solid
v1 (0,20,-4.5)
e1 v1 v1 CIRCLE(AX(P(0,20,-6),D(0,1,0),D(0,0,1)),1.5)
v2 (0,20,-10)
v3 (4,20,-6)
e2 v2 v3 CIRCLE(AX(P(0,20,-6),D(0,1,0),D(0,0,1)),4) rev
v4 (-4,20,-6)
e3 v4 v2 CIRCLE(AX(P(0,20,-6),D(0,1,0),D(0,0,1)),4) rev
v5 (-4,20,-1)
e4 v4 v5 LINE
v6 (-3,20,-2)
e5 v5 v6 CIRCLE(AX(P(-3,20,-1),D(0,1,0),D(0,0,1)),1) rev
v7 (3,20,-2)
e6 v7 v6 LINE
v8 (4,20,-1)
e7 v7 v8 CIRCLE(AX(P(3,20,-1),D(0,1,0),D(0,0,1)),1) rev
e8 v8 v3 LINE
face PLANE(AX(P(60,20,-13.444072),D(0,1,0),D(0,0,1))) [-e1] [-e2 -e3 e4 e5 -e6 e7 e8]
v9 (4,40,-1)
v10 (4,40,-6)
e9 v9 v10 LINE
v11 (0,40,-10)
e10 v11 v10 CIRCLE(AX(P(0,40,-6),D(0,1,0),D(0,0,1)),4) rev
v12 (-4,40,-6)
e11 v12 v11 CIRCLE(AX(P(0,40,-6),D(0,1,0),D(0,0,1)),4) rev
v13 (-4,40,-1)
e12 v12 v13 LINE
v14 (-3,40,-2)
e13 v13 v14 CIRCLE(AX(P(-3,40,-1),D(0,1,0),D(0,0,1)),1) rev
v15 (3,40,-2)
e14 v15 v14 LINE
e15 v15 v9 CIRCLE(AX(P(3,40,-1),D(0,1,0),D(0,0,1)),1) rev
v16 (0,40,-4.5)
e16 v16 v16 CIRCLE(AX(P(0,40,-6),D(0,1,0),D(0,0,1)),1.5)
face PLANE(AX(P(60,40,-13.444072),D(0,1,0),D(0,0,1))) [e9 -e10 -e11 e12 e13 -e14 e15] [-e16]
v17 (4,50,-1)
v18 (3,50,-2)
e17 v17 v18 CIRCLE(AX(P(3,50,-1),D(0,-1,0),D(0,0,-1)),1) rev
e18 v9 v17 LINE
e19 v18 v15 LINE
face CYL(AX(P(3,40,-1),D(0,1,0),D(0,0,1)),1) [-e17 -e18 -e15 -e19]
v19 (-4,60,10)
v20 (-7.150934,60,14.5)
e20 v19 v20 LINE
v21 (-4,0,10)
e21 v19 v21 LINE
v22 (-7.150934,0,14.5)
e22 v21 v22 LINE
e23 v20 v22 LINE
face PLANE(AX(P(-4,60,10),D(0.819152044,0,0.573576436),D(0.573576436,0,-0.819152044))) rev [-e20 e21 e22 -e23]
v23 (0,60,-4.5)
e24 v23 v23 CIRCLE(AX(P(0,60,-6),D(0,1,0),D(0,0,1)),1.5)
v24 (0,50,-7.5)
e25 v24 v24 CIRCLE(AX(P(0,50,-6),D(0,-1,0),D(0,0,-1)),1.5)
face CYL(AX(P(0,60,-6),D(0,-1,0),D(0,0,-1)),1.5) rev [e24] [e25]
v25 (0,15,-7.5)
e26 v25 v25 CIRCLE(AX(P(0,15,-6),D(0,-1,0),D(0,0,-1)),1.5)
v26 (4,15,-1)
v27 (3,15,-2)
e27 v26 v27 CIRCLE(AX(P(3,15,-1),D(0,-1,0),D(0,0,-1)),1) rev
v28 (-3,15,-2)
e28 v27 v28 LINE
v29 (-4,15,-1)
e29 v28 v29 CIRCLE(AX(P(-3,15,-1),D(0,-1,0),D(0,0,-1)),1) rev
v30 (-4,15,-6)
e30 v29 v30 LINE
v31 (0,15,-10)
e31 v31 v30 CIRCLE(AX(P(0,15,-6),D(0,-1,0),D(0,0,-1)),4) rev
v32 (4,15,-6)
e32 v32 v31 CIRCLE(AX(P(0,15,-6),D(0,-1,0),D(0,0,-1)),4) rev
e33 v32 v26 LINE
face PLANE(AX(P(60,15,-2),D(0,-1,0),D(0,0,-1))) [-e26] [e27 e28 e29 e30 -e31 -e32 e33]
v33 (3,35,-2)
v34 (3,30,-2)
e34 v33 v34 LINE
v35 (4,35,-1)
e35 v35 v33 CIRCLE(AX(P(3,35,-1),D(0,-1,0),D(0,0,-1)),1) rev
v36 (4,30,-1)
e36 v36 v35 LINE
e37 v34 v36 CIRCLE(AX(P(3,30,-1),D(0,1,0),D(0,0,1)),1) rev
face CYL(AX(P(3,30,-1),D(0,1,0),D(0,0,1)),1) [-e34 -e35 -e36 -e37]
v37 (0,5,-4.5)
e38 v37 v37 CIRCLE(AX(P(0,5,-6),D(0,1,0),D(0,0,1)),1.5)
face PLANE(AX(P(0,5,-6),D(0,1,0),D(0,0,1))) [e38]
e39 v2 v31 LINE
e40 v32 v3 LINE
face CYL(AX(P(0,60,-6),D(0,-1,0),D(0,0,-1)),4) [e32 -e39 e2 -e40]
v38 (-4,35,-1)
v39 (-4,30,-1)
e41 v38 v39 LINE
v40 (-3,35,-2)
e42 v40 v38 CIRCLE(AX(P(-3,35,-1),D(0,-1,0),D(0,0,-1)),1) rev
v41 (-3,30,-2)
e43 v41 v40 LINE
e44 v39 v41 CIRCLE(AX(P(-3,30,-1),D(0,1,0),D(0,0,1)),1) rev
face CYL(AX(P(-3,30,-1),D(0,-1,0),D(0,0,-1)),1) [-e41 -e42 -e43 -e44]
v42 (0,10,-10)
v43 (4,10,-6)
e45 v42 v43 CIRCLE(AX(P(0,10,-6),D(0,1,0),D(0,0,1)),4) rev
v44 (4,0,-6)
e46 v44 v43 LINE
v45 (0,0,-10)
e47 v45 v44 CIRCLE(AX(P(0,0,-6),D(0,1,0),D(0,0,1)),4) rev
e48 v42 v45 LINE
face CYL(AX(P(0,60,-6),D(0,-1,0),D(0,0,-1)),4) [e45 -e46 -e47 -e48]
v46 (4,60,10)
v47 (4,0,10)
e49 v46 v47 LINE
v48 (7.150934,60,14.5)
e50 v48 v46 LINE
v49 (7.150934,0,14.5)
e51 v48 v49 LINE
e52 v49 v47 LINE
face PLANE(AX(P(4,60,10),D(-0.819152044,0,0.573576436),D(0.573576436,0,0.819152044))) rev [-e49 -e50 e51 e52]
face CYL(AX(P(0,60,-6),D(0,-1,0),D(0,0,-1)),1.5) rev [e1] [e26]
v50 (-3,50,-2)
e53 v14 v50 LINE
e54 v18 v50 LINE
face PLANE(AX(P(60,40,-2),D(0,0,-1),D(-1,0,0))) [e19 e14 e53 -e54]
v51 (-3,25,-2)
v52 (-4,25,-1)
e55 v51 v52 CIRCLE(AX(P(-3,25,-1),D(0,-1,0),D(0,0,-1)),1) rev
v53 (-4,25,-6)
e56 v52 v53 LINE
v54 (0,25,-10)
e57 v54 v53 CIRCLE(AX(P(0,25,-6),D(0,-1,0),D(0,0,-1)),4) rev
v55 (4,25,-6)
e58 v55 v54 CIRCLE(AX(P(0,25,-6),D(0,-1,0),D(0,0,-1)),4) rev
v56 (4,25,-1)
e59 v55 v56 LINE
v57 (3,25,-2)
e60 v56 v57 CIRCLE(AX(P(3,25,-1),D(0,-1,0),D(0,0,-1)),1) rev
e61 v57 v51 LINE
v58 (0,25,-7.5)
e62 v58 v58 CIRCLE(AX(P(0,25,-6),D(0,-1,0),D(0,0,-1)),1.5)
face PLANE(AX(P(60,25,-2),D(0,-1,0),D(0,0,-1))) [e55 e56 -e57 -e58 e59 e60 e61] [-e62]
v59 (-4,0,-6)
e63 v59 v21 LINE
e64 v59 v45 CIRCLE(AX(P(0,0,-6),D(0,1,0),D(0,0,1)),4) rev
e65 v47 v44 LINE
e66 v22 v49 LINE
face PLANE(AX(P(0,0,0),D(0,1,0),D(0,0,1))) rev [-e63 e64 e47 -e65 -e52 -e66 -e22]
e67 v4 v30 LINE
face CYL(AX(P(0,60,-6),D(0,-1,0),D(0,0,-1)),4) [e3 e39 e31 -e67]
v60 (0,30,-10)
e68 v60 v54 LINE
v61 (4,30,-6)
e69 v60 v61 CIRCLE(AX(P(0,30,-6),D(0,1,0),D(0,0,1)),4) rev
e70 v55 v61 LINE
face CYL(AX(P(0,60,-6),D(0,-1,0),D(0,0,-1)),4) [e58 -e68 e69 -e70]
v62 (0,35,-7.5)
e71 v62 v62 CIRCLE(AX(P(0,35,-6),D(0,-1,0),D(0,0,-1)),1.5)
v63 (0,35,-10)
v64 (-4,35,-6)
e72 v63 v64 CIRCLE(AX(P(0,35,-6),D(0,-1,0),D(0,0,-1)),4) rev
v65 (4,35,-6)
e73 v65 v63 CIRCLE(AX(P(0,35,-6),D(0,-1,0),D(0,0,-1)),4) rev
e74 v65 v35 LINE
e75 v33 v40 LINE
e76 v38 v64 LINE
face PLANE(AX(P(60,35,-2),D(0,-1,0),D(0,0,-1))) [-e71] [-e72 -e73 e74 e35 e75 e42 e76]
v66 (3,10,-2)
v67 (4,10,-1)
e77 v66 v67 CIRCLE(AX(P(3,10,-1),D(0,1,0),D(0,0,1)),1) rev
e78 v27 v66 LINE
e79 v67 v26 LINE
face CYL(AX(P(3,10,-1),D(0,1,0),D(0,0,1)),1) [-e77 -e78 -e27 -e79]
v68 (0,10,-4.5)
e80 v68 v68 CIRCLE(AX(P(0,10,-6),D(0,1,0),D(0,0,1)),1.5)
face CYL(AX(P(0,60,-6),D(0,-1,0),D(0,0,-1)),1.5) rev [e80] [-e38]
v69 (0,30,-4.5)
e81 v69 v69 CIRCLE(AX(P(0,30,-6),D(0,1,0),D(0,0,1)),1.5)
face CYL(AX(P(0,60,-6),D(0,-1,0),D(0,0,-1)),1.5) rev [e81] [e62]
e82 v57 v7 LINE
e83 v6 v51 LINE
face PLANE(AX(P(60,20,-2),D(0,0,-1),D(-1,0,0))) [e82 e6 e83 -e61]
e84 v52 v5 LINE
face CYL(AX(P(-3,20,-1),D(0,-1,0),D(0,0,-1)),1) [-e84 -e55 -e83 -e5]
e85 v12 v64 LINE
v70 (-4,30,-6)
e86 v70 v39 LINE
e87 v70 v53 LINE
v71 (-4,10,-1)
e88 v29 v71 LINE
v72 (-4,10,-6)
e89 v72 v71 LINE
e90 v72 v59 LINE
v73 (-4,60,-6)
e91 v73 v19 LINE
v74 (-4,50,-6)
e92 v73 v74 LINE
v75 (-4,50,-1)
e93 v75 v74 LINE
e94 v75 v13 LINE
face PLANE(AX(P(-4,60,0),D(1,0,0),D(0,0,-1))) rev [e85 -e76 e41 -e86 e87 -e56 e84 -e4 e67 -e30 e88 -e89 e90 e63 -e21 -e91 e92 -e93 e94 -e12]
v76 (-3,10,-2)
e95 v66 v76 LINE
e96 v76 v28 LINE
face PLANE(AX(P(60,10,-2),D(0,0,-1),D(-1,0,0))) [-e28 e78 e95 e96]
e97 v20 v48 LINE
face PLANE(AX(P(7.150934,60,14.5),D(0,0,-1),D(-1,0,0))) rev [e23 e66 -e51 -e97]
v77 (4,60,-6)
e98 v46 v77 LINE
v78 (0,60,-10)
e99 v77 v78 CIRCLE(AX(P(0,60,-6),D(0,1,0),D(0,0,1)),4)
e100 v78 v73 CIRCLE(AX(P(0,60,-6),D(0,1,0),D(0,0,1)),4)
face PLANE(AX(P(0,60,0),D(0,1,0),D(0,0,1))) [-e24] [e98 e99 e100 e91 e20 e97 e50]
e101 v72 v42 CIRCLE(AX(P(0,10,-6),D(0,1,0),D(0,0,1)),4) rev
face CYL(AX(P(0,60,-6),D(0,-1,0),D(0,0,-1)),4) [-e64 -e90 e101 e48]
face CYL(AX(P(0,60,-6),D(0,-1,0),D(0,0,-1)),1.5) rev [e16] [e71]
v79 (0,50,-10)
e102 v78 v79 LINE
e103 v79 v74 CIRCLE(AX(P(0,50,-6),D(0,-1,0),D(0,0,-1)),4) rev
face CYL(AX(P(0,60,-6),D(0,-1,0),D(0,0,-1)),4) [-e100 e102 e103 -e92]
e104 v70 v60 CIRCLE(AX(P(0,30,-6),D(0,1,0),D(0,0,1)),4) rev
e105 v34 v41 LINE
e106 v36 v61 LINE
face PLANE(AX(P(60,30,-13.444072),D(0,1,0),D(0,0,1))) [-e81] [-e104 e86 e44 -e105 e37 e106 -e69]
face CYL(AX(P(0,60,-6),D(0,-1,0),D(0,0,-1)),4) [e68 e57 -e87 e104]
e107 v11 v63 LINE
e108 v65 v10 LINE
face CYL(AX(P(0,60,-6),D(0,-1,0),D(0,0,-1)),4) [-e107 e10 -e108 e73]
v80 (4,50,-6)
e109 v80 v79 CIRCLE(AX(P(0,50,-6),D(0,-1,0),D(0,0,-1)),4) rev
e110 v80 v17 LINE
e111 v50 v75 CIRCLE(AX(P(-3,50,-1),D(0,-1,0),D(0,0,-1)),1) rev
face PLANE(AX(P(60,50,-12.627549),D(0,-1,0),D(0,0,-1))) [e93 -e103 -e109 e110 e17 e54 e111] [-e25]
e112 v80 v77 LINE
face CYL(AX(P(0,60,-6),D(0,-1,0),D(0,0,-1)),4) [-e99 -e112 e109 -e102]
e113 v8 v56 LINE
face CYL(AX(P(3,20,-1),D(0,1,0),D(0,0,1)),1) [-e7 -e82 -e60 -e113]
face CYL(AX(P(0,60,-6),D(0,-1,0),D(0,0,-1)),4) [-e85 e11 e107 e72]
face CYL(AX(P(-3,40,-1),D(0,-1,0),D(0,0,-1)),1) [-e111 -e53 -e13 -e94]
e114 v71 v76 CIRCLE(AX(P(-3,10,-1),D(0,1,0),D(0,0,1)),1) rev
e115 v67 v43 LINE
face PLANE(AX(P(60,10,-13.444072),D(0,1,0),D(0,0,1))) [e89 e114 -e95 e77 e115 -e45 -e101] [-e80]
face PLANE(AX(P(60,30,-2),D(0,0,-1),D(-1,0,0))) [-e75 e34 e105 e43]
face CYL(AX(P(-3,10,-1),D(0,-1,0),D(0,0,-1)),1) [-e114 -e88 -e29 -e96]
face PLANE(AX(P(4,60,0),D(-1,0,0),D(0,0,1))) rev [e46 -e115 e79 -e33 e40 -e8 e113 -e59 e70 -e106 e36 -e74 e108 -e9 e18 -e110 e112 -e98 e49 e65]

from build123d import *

# Parameters (mm, degrees)
BOSS_EXTRUDE1_DEPTH     = 60
SKETCH2_W               = 8
SKETCH2_H               = 10
BOSS_EXTRUDE3_DEPTH     = 60
SKETCH3_R               = 1.5
CUT_EXTRUDE1_DEPTH      = 60
FILLET1_R               = 4
CUT_EXTRUDE2_DEPTH      = 60
CUT_EXTRUDE2_DEPTH_BACK = 60
FILLET3_R               = 1
SKETCH5_R               = 2.607227144
BOSS_EXTRUDE4_DEPTH     = 5


with BuildPart() as part:
    # Sketch1 → Boss-Extrude1 (new body)
    with BuildSketch(Plane(origin=(0, 0, 0), x_dir=(1, 0, 0), z_dir=(0, 1, 0))):
        Polygon((4, 0), (-4, 0), (-4, -10), (-7.150933922, -14.5), (-4, -14.5), (4, -14.5), (7.150933922, -14.5), (4, -10), align=None)
    extrude(amount=BOSS_EXTRUDE1_DEPTH)

    # Sketch2 → Boss-Extrude3 (add)
    with BuildSketch(Plane(origin=(0, 0, 0), x_dir=(1, 0, 0), z_dir=(0, 1, 0))):
        with Locations((0, 5)):
            Rectangle(SKETCH2_W, SKETCH2_H)
    extrude(amount=BOSS_EXTRUDE3_DEPTH)

    # Sketch3 → Cut-Extrude1 (cut)
    with BuildSketch(Plane(origin=(0, 0, 0), x_dir=(1, 0, 0), z_dir=(0, 1, 0))):
        with Locations(Location((0, 6, 0), (0, 0, 270))):
            Circle(SKETCH3_R)
    extrude(amount=CUT_EXTRUDE1_DEPTH, mode=Mode.SUBTRACT)

    # Fillet1
    fillet1_edges = [part.edges().sort_by_distance(p)[0] for p in [
        (-4, 30, -10),
        (4, 30, -10),
    ]]
    fillet(fillet1_edges, radius=FILLET1_R - 0.0001)  # a hair under: the kernel refuses the full size

    # Sketch4 → Cut-Extrude2 (cut, two sides: drawn at the far end of the back side and taken through both)
    with BuildSketch(Plane(origin=(0, 0, 0), x_dir=(0, 0, -1), z_dir=(1, 0, 0)).offset(-CUT_EXTRUDE2_DEPTH_BACK)):
        Polygon((12.627548849, 60), (16.888144273, 60), (16.888144273, 0), (13.444072136, 0), (13.444072136, 10), (2, 10), (2, 15), (13.444072136, 15), (13.444072136, 20), (2, 20), (2, 25), (13.444072136, 25), (13.444072136, 30), (2, 30), (2, 35), (13.444072136, 35), (13.444072136, 40), (2, 40), (2, 45), (2, 50), (12.627548849, 50), align=None)
    extrude(amount=CUT_EXTRUDE2_DEPTH + CUT_EXTRUDE2_DEPTH_BACK, mode=Mode.SUBTRACT)

    # Fillet3
    fillet3_edges = [part.edges().sort_by_distance(p)[0] for p in [
        (-4, 12.5, -2),
        (4, 12.5, -2),
        (4, 22.5, -2),
        (4, 32.5, -2),
        (4, 45, -2),
        (-4, 45, -2),
        (-4, 32.5, -2),
        (-4, 22.5, -2),
    ]]
    fillet(fillet3_edges, radius=FILLET3_R)

    # Sketch5 → Boss-Extrude4 (add)
    with BuildSketch(Plane(origin=(0, 0, 0), x_dir=(1, 0, 0), z_dir=(0, 1, 0))):
        with Locations((0, 6)):
            Circle(SKETCH5_R)
    extrude(amount=BOSS_EXTRUDE4_DEPTH)


solid = part.part
